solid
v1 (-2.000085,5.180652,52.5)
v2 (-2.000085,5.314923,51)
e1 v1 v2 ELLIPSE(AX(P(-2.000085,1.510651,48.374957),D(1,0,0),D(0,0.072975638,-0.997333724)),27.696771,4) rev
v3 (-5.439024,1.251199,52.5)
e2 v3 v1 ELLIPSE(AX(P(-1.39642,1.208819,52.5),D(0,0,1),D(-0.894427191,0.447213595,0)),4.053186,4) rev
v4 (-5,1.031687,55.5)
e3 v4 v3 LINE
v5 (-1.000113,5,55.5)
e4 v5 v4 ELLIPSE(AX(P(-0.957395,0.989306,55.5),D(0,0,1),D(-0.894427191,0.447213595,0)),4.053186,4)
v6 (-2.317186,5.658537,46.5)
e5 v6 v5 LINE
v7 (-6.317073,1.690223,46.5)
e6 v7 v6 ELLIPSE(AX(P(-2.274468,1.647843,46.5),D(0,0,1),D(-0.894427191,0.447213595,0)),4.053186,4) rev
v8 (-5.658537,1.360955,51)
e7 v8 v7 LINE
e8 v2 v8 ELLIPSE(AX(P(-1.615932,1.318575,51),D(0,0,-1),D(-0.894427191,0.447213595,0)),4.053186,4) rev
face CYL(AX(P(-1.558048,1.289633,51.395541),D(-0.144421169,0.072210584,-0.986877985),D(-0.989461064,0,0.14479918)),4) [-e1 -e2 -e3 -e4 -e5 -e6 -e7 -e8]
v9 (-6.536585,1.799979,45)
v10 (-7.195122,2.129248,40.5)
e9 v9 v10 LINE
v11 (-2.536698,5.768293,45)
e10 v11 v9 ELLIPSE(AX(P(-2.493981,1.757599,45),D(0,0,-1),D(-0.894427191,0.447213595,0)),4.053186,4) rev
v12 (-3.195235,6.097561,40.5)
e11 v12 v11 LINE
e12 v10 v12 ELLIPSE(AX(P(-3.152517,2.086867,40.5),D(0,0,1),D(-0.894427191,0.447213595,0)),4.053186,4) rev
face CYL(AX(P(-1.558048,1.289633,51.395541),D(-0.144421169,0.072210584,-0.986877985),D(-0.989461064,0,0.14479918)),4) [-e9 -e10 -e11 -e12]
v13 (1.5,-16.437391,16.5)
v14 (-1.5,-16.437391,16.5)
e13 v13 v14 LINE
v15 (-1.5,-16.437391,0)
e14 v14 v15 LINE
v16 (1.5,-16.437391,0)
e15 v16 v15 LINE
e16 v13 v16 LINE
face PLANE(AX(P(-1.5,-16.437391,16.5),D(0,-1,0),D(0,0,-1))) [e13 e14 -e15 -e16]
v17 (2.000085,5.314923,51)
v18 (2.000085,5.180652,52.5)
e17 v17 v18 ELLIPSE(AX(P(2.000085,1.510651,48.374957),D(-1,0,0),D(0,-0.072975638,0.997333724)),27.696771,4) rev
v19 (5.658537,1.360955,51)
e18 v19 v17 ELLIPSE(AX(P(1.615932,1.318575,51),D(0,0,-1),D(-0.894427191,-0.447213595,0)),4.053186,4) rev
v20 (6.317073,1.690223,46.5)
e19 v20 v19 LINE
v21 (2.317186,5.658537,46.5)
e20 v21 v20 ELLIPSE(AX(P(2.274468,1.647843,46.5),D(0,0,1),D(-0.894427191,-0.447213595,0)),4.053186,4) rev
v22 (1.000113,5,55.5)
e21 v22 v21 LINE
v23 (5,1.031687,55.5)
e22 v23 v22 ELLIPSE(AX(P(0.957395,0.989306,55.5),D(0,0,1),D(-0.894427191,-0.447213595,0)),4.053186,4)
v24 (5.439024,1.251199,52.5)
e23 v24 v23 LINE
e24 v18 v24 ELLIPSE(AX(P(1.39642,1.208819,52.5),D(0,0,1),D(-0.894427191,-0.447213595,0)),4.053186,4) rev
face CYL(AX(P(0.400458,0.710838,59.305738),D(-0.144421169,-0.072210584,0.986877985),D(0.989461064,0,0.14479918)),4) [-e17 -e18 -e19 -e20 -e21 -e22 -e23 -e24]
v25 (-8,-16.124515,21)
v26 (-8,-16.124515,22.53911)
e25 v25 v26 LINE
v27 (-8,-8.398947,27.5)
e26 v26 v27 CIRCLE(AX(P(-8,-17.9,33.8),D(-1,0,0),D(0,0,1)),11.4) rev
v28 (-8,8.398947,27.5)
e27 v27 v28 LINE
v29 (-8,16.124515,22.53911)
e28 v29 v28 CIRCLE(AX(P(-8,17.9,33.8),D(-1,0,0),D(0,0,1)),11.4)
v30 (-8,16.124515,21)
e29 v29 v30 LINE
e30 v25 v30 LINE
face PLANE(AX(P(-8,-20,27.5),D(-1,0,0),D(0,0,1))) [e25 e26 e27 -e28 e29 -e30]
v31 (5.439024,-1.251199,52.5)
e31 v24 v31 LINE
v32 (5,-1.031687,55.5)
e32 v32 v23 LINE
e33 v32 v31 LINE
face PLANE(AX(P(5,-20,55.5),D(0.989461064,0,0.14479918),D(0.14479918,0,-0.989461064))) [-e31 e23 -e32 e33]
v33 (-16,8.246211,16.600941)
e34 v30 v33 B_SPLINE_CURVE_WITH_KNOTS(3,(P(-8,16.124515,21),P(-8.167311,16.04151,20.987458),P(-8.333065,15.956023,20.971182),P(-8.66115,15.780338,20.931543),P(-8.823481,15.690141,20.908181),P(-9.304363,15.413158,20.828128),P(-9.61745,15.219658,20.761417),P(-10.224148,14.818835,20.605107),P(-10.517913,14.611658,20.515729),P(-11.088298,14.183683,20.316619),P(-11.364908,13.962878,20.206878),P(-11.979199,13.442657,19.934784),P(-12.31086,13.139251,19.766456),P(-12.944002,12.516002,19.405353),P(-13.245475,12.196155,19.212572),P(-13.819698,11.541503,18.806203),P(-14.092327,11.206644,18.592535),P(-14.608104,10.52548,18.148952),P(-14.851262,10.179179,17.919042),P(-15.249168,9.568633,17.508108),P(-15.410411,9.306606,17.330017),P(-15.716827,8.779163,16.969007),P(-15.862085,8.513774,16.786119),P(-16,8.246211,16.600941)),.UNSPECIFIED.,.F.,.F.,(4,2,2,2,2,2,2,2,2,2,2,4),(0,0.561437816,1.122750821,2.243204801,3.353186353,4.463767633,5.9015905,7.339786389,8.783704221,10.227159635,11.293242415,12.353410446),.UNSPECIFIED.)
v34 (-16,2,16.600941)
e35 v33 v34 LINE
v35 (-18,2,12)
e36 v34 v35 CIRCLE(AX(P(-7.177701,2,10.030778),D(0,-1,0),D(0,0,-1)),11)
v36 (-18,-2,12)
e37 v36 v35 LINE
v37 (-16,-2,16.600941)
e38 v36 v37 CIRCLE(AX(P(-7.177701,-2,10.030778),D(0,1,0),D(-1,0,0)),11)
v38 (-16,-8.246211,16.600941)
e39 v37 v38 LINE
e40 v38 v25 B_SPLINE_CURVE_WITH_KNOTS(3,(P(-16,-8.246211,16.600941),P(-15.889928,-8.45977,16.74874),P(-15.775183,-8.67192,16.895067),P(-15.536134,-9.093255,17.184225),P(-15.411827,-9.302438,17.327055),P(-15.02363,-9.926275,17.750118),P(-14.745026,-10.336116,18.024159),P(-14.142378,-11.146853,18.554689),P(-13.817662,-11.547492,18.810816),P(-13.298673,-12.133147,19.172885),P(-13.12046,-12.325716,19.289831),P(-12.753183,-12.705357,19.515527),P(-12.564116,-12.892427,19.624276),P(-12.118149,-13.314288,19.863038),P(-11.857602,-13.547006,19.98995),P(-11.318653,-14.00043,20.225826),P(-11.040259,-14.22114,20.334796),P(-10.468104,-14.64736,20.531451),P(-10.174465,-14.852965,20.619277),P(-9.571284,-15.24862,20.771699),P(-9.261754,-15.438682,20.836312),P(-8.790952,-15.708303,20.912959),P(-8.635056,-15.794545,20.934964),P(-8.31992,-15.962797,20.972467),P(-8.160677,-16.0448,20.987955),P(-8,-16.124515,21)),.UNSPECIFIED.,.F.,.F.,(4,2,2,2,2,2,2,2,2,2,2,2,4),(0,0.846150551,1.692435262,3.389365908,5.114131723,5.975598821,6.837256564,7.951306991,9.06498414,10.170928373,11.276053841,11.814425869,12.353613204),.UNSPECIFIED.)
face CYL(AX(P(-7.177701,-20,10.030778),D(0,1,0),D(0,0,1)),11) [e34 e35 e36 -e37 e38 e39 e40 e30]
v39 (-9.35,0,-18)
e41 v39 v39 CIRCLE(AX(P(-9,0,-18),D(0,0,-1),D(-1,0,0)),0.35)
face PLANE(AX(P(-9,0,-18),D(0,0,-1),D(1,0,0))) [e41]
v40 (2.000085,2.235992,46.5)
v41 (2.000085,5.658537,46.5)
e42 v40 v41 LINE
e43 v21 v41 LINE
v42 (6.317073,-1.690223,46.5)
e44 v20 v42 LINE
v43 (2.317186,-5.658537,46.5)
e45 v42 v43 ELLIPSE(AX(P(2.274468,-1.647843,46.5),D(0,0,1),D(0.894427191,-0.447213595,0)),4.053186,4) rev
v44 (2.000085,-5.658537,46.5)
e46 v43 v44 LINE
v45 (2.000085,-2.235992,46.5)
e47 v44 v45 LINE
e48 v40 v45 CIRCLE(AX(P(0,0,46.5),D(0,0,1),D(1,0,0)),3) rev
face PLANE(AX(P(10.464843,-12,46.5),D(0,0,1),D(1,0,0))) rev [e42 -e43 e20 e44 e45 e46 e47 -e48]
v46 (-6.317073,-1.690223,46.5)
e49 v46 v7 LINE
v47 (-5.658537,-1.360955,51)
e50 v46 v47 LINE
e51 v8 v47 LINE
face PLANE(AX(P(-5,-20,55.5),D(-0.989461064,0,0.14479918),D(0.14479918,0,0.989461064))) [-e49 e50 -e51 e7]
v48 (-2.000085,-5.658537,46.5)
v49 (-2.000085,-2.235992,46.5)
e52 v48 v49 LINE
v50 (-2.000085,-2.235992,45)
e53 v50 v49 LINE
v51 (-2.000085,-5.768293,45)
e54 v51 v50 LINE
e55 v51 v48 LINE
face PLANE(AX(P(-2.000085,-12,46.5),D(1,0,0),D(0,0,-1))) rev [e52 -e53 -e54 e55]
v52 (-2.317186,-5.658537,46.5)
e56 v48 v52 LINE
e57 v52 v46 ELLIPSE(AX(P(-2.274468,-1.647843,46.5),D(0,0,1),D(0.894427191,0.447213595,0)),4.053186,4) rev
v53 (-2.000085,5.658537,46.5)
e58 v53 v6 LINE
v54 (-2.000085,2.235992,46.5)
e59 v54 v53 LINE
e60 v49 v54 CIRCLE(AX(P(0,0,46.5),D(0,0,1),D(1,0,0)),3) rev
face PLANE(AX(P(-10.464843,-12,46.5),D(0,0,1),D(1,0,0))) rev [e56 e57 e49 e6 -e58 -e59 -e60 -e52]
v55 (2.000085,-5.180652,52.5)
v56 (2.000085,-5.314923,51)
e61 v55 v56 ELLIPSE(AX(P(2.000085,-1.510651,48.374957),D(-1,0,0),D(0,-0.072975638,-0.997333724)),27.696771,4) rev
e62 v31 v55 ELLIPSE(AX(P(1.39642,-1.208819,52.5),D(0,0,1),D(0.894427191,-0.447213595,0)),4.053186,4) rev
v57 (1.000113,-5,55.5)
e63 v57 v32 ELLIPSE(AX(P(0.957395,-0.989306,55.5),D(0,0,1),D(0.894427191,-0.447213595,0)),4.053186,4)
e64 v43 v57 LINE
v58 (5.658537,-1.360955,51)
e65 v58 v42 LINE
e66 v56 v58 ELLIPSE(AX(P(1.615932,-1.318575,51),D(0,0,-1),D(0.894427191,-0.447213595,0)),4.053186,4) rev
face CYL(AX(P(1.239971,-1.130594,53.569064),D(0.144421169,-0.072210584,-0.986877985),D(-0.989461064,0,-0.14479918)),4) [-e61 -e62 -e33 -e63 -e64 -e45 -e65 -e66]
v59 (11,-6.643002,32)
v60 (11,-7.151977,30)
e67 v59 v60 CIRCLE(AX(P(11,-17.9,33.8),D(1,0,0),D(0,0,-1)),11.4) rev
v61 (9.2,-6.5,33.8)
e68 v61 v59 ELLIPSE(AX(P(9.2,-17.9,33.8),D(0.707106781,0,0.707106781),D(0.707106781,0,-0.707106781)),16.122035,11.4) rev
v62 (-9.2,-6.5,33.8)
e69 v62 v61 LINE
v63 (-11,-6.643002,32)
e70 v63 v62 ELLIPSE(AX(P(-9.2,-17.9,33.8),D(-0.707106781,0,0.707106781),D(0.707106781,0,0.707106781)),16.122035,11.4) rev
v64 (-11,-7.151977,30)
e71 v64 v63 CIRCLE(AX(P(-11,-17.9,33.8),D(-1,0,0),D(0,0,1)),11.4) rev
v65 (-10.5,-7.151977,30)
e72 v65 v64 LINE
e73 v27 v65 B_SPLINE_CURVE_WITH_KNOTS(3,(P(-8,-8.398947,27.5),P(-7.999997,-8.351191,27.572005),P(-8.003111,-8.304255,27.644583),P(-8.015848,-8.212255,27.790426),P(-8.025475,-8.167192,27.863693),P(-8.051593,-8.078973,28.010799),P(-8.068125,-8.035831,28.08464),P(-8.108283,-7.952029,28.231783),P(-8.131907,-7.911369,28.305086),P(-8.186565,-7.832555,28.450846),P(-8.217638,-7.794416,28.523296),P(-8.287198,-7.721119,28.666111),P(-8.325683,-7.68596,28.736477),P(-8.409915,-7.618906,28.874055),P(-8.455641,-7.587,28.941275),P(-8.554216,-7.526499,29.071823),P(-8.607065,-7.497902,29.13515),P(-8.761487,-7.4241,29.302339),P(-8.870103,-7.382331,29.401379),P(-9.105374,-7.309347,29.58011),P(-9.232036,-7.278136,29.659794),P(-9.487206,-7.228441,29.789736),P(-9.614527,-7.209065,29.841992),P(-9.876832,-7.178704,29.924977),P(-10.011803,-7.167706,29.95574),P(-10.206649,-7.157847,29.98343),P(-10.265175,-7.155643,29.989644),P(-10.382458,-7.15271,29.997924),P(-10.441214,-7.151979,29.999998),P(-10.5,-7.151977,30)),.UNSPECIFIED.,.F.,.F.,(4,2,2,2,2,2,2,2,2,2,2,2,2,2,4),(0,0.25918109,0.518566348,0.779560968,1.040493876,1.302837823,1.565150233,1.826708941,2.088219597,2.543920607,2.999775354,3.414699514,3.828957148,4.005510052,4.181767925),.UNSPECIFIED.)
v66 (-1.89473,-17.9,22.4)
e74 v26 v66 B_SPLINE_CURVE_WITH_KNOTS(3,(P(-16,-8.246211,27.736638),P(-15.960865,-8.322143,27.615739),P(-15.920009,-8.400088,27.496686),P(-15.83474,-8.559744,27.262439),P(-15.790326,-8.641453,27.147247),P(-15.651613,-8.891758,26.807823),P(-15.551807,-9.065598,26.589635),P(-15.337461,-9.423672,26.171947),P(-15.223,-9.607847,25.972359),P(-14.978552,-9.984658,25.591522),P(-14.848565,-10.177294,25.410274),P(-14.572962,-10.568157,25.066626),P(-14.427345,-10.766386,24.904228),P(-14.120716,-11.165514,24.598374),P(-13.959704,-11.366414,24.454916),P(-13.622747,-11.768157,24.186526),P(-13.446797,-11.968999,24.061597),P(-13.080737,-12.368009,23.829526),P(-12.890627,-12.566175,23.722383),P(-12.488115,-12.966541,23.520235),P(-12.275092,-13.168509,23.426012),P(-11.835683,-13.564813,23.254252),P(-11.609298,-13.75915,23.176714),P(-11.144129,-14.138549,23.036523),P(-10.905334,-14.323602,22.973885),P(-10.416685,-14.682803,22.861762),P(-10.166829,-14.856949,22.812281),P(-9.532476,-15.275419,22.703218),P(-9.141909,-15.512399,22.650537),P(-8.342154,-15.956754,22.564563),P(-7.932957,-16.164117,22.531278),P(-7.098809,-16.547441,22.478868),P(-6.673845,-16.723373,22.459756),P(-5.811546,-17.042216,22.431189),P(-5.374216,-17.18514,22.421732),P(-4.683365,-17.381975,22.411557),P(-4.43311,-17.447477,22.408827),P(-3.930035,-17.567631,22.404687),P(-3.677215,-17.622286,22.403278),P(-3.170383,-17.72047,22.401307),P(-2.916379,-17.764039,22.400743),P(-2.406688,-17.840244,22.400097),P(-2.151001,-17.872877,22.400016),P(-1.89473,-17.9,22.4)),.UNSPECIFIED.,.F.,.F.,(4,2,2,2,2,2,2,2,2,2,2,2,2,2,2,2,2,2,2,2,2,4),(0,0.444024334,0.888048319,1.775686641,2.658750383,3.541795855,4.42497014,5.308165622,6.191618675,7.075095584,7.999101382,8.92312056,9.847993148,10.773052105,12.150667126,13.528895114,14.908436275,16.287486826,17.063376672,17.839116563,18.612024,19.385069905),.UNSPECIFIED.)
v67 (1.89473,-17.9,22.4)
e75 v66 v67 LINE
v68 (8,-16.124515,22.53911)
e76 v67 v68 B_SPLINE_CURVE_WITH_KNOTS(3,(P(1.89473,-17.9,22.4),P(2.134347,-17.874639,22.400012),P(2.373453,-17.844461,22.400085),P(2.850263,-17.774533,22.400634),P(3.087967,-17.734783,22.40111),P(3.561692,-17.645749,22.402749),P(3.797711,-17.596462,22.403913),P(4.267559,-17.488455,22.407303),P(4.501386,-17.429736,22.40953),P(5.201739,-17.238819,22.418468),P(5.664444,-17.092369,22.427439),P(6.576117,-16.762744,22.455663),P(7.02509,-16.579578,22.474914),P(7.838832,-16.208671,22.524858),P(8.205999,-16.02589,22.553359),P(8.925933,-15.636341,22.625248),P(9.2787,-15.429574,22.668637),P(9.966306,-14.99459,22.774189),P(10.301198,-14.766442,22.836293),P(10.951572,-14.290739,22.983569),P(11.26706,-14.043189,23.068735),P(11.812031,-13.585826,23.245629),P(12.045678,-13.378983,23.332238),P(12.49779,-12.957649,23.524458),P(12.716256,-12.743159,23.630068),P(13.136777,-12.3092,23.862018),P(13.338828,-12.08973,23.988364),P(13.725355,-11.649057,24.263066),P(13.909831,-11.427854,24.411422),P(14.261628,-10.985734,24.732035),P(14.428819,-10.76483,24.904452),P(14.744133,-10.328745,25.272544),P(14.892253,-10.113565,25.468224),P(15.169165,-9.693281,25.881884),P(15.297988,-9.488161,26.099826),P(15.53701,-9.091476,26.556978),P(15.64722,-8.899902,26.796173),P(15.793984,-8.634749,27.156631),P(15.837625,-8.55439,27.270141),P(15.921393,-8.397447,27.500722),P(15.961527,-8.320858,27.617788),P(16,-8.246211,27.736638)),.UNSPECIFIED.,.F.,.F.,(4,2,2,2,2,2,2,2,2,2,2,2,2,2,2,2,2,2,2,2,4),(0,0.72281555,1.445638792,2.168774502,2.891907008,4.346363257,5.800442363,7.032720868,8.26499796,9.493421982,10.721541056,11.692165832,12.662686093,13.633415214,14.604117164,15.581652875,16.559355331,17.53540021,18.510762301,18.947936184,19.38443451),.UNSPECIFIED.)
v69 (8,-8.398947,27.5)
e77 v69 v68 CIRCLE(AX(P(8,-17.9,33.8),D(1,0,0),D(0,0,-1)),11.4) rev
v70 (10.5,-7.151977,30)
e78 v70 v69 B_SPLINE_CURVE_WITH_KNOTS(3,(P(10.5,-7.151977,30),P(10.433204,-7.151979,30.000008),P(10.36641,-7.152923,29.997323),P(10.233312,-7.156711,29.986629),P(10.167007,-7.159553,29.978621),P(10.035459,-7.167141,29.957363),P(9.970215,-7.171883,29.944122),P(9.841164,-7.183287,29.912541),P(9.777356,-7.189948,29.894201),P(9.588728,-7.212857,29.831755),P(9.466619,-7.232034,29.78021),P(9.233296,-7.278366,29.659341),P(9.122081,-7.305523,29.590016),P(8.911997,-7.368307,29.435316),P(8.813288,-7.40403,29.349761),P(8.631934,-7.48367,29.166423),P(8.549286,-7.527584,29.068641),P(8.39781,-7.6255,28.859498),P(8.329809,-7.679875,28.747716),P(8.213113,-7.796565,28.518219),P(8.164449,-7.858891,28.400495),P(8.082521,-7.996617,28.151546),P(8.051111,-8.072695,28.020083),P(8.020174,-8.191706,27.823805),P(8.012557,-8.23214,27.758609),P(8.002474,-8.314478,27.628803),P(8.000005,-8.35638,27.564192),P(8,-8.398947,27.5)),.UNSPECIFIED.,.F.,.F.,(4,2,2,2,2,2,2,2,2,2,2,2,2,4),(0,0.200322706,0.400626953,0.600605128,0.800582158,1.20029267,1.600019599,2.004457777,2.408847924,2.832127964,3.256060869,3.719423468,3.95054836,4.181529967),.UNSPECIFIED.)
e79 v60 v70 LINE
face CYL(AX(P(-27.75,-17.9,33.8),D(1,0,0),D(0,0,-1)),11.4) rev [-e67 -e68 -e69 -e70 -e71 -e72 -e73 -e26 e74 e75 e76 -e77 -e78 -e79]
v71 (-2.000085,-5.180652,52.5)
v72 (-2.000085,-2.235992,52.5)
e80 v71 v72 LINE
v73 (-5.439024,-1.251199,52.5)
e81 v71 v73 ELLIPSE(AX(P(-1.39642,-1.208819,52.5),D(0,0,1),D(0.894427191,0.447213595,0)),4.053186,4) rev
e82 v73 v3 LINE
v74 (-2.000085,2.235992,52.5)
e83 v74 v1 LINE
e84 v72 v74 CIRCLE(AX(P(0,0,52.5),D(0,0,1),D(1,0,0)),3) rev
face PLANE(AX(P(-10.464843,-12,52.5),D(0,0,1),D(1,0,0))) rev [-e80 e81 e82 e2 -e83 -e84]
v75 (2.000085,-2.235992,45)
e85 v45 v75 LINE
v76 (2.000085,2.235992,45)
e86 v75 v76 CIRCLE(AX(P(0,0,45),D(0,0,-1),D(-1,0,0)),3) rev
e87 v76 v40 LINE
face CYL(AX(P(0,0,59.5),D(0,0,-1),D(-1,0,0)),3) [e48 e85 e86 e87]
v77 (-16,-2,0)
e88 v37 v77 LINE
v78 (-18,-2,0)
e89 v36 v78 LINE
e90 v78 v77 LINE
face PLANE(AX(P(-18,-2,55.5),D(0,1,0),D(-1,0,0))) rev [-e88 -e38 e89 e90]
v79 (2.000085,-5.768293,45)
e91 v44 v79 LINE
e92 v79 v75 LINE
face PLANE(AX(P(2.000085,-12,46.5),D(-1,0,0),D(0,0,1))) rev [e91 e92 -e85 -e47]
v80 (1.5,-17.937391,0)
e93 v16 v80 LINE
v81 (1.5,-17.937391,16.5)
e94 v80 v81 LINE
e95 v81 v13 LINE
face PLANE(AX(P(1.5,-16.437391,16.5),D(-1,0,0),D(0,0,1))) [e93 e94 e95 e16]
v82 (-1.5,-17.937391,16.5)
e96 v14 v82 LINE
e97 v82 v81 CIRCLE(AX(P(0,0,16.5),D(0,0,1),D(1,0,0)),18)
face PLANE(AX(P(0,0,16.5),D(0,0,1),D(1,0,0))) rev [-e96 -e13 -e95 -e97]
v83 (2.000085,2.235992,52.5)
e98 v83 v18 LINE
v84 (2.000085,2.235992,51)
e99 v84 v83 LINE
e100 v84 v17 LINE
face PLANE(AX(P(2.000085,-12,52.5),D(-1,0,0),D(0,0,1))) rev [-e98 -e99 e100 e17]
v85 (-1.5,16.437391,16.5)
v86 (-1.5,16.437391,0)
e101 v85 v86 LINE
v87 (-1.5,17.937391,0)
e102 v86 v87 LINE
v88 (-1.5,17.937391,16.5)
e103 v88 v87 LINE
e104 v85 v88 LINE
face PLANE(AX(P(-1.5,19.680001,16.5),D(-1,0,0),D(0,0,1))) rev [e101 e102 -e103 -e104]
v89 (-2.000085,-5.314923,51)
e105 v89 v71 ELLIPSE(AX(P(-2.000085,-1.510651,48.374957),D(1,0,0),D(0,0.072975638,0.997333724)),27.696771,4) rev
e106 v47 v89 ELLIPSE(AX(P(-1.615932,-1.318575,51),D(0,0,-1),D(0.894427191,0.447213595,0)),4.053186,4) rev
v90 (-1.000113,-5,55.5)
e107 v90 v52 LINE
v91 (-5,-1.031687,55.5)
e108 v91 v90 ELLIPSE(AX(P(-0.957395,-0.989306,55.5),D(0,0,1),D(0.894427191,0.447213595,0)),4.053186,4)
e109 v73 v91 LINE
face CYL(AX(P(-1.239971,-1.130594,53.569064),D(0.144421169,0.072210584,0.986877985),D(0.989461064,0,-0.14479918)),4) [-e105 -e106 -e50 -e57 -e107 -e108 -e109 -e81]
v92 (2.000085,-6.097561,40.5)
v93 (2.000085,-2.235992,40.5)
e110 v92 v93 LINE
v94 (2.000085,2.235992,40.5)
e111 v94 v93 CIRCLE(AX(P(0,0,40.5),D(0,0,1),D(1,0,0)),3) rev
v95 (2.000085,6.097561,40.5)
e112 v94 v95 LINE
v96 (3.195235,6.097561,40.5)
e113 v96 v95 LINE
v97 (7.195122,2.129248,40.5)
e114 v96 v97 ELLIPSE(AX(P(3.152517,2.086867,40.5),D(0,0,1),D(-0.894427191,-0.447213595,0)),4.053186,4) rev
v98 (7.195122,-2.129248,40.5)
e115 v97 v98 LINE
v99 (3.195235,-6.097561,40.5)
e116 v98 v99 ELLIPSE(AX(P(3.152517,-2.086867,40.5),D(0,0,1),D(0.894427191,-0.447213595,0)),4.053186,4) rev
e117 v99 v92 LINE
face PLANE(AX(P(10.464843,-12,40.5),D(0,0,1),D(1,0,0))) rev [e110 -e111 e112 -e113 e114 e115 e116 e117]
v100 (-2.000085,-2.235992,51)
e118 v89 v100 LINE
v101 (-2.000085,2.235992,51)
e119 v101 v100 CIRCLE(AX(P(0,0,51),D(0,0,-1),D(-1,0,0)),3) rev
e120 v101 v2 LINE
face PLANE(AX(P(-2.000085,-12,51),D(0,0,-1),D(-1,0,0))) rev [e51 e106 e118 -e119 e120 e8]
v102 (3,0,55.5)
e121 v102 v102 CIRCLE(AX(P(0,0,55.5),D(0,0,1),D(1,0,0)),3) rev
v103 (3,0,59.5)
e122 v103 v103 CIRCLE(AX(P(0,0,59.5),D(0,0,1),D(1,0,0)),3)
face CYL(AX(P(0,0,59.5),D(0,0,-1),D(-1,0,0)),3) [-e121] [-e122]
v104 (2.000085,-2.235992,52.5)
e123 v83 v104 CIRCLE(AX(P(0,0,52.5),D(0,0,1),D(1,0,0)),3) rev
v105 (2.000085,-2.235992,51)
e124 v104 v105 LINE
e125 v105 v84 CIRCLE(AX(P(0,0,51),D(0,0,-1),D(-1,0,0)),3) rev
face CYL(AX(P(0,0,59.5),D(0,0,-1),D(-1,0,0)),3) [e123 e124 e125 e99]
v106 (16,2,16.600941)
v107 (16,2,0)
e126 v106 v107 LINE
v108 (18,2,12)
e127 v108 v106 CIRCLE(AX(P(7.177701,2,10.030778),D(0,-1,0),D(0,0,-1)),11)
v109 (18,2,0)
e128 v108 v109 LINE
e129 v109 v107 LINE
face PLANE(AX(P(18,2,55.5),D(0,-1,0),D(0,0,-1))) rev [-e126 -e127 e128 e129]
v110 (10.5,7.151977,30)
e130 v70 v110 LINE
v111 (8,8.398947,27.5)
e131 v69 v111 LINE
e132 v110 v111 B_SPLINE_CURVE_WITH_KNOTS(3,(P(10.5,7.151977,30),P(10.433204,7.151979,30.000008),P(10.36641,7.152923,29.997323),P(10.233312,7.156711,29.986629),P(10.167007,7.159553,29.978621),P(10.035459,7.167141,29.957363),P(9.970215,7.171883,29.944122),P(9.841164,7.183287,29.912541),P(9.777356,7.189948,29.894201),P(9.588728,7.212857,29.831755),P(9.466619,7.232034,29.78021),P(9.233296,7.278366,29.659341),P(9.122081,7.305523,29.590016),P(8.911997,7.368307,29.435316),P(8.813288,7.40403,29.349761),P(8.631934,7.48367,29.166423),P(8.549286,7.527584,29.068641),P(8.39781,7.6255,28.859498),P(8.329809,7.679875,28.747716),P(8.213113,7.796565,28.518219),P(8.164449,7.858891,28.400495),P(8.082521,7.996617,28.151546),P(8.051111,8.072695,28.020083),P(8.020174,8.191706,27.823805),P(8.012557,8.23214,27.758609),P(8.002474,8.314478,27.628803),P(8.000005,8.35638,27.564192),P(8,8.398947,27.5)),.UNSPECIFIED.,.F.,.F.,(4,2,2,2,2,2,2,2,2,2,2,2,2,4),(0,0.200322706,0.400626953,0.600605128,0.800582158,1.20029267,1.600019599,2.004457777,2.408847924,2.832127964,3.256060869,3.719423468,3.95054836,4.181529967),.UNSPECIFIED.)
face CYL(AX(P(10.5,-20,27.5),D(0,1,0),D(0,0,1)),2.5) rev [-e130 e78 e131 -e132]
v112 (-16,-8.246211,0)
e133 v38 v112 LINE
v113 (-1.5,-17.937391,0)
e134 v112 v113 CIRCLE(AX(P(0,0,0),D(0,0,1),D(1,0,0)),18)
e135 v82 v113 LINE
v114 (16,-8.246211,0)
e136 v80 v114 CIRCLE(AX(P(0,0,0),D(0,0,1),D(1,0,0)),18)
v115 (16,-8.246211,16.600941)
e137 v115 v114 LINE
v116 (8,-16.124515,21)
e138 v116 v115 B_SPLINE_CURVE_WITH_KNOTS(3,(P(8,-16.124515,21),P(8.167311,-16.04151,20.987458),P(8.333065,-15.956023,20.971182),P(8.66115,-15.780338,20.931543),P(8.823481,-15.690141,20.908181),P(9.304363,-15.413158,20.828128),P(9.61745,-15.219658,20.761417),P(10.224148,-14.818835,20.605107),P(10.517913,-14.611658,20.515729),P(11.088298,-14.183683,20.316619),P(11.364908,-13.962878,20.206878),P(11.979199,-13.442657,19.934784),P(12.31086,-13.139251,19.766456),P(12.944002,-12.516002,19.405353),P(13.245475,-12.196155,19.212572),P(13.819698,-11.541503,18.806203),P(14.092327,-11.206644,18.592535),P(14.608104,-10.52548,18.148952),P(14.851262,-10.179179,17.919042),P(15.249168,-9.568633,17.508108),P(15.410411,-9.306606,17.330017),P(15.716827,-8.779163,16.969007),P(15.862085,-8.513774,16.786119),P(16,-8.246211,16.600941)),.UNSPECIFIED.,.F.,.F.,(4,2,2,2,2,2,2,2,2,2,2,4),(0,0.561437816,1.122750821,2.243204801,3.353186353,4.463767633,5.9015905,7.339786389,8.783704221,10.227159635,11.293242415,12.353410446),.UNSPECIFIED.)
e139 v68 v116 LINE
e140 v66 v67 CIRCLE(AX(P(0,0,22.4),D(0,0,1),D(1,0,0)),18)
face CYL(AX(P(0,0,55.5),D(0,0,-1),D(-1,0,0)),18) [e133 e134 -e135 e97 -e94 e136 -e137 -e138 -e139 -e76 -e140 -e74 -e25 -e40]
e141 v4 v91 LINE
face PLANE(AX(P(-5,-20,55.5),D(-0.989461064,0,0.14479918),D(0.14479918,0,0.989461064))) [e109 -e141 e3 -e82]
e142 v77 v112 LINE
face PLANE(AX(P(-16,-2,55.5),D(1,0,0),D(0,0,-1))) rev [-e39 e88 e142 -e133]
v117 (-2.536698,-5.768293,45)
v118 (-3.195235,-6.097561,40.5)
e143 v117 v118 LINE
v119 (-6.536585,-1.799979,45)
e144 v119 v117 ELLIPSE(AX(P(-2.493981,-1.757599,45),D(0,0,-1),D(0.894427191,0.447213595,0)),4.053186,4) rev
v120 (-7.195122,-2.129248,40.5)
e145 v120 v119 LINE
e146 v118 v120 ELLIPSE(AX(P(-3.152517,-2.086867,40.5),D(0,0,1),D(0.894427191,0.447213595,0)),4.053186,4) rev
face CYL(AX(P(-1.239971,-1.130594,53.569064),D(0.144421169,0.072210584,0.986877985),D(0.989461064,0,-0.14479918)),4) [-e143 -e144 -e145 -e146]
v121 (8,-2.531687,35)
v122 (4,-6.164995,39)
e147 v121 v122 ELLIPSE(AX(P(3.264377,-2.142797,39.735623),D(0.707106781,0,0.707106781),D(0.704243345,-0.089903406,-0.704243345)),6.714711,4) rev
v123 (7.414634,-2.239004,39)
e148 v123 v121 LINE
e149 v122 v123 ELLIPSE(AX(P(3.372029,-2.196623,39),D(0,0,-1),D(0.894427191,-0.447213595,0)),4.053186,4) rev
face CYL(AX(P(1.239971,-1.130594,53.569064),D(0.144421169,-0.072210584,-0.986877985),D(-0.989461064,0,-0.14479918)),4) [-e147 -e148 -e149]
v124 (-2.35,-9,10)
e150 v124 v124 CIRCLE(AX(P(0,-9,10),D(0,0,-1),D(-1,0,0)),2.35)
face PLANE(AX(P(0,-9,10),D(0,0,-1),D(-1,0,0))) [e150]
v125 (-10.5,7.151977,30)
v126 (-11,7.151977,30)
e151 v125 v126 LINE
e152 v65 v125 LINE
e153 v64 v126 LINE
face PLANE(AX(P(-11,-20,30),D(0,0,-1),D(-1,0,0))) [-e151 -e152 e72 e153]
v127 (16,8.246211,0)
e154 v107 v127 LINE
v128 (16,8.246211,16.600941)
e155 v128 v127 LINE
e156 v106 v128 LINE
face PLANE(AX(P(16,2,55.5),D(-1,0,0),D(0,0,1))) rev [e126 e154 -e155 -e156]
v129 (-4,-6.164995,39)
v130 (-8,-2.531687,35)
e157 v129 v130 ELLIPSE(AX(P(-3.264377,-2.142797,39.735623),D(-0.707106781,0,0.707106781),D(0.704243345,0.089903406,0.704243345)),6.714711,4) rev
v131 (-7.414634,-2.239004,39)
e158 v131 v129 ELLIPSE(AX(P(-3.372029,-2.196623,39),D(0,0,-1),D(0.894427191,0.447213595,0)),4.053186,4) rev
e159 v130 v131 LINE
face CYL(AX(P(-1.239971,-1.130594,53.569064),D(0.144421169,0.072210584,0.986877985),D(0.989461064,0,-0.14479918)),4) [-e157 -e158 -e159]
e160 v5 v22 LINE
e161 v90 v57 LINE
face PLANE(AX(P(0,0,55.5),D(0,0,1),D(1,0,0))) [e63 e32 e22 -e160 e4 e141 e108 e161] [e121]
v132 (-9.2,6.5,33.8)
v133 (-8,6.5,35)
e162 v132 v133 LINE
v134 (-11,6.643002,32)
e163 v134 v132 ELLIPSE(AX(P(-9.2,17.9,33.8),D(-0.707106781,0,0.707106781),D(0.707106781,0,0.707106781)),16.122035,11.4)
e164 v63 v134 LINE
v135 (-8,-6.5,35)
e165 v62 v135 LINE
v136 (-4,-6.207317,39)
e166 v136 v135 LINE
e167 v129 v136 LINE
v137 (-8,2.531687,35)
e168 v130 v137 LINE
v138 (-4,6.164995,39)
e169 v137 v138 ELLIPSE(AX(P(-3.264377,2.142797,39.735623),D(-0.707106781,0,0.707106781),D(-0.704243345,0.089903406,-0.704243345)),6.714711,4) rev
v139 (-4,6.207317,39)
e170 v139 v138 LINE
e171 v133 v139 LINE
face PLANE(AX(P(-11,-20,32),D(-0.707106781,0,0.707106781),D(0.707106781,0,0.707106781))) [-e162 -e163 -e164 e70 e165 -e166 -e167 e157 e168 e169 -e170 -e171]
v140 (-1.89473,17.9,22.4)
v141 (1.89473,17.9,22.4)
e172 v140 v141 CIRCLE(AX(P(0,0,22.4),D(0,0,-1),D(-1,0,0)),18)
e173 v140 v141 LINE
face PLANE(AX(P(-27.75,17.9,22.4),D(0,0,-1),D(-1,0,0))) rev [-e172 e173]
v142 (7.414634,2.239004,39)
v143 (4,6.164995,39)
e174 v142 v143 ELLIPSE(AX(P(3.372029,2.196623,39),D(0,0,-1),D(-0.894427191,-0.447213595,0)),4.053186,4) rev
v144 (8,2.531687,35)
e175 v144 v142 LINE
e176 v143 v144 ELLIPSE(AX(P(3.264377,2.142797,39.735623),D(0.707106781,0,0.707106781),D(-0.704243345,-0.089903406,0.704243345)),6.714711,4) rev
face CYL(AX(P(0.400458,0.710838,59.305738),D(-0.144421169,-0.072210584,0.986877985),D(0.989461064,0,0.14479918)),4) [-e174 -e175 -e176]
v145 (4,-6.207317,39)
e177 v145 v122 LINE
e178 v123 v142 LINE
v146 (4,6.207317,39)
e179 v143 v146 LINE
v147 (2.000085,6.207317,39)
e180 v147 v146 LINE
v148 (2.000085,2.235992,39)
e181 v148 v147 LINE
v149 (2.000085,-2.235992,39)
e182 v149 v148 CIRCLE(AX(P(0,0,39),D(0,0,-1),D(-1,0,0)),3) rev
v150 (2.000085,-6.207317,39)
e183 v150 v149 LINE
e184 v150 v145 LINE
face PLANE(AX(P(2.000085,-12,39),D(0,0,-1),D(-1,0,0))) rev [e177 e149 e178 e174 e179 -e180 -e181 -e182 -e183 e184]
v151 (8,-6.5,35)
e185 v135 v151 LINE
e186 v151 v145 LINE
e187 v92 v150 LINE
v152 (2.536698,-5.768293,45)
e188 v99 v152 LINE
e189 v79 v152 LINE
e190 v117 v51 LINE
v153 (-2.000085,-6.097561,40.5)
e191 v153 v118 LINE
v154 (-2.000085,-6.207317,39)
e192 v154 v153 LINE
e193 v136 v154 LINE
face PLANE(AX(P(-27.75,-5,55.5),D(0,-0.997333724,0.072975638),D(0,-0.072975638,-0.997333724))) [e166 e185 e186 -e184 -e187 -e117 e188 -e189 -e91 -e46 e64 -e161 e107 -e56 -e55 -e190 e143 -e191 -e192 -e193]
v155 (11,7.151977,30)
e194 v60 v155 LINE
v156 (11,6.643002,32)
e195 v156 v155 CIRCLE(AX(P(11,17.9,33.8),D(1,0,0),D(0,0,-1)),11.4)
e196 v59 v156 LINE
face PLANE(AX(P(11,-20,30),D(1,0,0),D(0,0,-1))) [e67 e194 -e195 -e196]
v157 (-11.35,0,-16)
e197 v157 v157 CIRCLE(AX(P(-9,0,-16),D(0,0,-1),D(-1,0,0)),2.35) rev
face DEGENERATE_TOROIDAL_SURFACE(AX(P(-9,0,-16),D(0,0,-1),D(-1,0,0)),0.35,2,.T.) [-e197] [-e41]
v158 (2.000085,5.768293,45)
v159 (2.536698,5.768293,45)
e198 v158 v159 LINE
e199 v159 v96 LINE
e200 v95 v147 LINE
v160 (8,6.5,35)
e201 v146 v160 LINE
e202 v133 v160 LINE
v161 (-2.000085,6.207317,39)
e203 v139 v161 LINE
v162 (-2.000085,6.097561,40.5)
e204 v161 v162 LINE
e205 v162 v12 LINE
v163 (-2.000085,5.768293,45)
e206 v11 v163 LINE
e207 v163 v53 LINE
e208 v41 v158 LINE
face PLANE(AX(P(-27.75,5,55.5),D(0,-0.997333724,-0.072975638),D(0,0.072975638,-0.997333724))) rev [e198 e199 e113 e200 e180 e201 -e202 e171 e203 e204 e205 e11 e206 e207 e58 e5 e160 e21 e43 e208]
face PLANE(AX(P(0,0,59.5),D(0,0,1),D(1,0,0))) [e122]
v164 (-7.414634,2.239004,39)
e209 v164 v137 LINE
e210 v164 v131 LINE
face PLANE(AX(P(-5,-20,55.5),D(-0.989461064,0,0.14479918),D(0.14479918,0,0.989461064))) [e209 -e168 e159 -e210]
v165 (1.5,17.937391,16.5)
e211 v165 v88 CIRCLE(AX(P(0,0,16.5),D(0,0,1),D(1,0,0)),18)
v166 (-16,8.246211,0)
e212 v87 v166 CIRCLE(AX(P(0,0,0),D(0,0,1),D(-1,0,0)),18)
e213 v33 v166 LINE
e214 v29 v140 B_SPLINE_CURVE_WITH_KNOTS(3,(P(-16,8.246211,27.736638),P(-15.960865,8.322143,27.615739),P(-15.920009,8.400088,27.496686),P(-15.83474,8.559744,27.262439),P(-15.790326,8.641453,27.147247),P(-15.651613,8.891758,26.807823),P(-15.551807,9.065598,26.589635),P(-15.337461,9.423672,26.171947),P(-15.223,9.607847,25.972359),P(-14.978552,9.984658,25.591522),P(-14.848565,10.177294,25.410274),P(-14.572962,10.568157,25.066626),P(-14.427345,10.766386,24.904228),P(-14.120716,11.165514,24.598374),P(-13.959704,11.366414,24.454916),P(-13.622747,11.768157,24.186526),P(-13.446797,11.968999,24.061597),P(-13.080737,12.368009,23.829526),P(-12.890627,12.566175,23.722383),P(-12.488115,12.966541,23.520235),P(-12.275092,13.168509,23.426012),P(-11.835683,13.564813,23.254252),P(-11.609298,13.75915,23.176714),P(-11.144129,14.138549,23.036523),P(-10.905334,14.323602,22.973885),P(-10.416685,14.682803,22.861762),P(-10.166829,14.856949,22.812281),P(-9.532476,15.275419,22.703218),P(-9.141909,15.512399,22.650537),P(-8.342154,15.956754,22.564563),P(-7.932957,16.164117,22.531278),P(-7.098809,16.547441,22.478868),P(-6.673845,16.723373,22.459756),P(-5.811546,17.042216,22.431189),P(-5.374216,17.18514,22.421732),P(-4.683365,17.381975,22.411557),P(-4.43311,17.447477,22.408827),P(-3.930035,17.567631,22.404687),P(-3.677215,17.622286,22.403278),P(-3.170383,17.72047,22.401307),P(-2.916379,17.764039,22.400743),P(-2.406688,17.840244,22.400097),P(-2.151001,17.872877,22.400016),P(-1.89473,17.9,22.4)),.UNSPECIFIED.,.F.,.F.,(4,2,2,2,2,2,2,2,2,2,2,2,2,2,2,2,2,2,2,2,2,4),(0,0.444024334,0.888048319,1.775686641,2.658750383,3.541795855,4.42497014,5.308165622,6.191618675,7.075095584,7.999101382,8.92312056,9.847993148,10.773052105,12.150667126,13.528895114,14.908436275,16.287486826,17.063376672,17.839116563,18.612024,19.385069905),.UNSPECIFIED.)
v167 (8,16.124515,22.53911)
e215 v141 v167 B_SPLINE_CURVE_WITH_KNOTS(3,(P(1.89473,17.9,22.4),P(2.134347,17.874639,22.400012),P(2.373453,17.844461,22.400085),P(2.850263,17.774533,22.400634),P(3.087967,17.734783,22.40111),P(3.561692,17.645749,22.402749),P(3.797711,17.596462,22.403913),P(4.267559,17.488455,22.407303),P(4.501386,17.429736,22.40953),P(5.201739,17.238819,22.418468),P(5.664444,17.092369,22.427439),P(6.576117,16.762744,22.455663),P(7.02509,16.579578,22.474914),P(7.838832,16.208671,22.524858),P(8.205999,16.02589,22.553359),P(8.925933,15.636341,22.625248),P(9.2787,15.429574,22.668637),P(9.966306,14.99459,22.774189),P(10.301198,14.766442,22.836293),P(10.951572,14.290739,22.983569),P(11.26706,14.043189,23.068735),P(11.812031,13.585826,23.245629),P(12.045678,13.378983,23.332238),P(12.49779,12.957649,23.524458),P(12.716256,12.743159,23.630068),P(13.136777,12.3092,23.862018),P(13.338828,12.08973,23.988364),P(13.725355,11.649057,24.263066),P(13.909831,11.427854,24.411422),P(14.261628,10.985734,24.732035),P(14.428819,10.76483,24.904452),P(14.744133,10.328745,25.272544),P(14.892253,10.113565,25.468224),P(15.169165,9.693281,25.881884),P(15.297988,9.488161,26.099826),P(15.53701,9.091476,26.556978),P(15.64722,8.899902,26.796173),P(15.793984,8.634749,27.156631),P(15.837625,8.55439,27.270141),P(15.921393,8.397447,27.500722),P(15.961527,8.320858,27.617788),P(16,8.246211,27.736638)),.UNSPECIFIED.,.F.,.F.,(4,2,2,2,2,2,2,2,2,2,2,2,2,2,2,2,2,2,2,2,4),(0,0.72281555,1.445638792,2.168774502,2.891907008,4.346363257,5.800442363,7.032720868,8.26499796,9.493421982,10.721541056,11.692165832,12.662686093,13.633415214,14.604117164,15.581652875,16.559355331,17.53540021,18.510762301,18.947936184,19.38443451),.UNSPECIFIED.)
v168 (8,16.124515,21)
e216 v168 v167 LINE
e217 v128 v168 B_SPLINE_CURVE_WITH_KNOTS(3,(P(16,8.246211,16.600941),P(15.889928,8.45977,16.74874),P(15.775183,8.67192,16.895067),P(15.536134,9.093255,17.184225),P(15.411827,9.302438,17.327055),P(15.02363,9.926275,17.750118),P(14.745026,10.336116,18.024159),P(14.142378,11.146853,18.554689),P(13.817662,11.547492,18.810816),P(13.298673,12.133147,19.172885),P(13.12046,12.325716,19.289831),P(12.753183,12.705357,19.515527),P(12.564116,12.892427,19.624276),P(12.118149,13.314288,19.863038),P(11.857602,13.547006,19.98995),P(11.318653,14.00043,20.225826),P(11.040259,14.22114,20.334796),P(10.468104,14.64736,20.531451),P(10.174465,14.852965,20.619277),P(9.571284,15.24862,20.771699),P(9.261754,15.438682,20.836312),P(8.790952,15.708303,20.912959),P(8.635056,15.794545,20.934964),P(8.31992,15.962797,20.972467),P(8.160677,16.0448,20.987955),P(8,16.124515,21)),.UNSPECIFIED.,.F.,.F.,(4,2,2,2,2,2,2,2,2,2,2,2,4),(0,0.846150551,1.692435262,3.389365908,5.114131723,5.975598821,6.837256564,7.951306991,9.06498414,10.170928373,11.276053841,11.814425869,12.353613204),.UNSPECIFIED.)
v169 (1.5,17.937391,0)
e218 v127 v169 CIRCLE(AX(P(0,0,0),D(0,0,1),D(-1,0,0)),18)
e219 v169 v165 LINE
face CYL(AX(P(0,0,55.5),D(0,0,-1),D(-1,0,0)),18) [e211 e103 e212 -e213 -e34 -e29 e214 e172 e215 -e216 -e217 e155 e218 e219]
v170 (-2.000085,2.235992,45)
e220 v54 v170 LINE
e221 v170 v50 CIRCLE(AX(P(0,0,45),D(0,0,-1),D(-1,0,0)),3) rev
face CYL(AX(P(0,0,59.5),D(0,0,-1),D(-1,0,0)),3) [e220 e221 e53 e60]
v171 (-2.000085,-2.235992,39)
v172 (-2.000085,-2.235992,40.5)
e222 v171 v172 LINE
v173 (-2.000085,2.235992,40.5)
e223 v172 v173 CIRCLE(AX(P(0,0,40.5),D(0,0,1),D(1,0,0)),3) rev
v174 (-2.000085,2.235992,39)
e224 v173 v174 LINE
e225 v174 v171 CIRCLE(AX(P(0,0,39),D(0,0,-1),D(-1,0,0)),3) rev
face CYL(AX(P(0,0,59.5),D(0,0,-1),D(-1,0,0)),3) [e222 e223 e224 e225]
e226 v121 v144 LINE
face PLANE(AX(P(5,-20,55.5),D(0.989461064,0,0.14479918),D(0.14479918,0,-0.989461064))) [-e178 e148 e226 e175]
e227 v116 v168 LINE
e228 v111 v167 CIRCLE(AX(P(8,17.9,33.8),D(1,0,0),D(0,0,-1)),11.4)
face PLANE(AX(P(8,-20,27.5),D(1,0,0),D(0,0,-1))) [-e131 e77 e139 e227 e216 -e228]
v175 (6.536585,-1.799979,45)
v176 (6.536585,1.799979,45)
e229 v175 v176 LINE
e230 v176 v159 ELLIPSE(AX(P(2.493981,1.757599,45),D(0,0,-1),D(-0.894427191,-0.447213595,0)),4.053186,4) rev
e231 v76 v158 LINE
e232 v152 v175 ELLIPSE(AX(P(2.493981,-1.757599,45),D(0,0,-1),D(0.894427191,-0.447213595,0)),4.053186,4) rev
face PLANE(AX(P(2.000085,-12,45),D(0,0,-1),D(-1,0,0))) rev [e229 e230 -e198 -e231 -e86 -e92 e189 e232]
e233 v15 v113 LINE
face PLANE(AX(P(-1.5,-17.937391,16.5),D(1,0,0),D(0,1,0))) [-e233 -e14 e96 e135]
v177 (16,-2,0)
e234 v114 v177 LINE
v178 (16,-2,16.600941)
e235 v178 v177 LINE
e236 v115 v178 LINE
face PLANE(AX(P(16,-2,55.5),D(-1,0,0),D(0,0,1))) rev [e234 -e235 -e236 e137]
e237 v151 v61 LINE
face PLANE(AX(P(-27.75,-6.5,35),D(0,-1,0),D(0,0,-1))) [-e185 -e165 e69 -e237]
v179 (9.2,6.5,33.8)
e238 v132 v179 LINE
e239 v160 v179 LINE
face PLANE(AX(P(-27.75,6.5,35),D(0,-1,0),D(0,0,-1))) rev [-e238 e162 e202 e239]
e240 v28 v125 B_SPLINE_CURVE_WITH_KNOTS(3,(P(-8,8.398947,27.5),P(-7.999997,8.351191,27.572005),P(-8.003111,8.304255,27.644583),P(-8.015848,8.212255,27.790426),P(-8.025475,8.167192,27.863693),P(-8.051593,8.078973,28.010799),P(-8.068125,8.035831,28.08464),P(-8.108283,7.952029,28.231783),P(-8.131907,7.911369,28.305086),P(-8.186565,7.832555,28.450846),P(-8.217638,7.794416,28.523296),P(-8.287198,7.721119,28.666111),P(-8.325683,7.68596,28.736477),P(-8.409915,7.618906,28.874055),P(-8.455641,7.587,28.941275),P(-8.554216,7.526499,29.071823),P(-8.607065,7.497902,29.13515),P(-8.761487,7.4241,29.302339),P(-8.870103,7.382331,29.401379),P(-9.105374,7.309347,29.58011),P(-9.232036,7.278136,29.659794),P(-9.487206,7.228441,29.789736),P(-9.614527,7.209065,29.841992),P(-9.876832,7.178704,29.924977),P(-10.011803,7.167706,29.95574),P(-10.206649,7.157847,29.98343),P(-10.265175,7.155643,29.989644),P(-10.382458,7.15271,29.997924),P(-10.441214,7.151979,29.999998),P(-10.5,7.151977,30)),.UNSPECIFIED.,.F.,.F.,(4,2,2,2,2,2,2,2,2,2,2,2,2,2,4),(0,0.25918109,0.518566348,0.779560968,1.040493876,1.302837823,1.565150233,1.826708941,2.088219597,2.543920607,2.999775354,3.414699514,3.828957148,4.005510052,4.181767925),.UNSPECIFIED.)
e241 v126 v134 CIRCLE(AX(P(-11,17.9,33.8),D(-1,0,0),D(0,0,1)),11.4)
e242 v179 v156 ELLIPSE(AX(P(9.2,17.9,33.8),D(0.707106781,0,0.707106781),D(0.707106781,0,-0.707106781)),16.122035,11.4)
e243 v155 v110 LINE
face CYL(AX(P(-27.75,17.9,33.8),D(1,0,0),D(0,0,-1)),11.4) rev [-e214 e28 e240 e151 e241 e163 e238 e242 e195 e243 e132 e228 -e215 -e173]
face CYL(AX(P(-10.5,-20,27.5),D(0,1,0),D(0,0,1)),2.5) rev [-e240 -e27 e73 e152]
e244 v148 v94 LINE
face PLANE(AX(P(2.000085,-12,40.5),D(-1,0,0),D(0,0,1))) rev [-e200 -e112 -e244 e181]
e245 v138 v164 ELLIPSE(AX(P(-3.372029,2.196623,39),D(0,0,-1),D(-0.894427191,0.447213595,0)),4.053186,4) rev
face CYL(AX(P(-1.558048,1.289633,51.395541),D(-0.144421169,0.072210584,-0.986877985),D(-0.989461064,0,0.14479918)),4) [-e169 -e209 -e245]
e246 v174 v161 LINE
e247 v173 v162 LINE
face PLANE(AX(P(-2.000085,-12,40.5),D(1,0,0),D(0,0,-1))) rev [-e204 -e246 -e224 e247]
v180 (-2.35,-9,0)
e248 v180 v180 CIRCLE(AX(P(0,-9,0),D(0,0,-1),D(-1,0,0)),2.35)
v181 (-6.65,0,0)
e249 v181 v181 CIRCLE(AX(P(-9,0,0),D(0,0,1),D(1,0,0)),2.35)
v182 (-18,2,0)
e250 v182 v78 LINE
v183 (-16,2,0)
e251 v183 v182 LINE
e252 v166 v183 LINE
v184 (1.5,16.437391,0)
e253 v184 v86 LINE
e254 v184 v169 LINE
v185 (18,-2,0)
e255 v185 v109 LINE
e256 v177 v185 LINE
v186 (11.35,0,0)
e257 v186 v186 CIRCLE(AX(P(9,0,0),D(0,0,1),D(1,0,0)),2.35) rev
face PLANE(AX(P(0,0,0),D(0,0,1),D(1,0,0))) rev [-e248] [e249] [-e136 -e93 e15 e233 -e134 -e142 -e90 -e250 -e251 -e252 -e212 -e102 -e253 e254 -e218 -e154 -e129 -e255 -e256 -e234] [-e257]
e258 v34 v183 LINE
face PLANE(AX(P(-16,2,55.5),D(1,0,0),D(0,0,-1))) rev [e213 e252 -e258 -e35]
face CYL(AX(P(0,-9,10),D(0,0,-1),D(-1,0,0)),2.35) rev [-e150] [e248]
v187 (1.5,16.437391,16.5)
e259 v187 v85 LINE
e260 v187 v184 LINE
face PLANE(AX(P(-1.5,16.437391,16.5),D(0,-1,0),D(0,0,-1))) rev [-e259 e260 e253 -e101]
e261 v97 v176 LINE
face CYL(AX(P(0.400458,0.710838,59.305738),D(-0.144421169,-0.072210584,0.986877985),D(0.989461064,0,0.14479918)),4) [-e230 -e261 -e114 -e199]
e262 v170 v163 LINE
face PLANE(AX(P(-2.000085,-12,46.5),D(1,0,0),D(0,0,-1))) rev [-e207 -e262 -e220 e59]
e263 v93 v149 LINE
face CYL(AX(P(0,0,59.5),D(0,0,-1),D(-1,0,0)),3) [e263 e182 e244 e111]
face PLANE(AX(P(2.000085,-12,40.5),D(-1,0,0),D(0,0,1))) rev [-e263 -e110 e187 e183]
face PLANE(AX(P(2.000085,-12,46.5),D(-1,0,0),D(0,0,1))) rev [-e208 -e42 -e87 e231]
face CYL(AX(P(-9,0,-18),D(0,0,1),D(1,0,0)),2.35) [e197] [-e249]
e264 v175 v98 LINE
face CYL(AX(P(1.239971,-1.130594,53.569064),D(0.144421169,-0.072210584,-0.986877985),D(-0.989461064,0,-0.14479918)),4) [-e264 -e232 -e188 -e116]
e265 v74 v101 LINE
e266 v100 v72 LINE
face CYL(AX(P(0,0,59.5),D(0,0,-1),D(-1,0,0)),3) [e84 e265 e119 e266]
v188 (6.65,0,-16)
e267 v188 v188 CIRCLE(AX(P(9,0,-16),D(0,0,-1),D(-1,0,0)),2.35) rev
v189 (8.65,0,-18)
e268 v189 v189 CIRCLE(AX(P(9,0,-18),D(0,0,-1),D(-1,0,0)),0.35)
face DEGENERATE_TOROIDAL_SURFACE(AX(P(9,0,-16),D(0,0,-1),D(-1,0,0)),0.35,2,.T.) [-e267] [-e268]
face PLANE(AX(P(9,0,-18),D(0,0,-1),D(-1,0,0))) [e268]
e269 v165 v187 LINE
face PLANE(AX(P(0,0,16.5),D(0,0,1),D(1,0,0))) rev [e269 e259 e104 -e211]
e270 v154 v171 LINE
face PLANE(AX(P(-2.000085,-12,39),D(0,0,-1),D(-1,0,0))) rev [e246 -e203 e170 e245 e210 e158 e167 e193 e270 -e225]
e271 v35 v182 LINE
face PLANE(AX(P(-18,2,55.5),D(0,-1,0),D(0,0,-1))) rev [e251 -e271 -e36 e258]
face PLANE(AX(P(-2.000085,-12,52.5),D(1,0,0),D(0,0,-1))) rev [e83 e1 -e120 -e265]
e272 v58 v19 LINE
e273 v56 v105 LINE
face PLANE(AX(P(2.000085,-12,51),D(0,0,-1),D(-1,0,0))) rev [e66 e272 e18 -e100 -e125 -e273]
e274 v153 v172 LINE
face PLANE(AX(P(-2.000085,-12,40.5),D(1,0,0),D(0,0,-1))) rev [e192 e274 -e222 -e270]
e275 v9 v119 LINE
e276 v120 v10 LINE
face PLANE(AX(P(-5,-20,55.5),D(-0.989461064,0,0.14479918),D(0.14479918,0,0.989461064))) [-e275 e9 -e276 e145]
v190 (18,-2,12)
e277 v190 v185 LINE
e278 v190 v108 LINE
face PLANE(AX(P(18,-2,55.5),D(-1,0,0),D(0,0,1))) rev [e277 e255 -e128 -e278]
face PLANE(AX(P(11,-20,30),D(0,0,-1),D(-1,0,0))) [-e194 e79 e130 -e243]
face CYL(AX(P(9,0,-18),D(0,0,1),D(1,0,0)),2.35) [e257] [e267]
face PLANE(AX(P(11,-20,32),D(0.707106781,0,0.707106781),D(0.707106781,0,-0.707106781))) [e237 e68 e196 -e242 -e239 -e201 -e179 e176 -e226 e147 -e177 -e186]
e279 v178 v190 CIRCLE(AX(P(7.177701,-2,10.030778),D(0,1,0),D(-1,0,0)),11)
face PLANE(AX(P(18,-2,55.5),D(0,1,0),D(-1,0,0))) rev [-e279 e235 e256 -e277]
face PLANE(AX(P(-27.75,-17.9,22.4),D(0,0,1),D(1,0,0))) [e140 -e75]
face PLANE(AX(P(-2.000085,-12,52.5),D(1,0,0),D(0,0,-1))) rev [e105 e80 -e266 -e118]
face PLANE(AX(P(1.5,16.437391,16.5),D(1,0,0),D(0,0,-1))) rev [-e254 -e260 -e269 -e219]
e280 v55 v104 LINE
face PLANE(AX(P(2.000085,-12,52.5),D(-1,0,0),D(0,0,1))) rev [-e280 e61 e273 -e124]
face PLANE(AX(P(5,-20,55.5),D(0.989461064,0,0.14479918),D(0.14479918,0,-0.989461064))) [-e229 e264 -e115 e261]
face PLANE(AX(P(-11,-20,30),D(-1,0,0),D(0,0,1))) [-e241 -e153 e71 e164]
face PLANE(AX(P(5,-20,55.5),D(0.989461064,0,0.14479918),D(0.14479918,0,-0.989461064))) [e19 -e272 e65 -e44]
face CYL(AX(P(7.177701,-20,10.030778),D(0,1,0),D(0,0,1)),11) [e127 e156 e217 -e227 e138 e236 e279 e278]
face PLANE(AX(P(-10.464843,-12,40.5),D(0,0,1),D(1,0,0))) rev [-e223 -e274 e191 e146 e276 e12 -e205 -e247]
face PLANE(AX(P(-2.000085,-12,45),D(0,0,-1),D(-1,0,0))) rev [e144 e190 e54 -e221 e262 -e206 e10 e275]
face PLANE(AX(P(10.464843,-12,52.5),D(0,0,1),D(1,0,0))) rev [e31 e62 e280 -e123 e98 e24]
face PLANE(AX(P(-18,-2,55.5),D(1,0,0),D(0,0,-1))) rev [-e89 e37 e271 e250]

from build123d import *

# Parameters (mm, degrees)
BOSS_EXTRUDE1_DEPTH  = 55.5
SKETCH4_OUTSIDE_W    = 53.062
SKETCH4_OUTSIDE_H    = 72.562
CUT_EXTRUDE3_DEPTH   = 20
CUT_EXTRUDE4_DEPTH   = 16.5
SKETCH6_R            = 5
BOSS_EXTRUDE3_DEPTH  = 55.5
SKETCH7_OUTSIDE_W    = 72.562
SKETCH7_OUTSIDE_H    = 53.062
CUT_EXTRUDE6_DEPTH   = 27.75
FILLET3_R            = 4
SKETCH8_R            = 2.35
BOSS_EXTRUDE4_DEPTH  = 18
FILLET4_R            = 2
FILLET4_OF_MIRROR2_R = 2
SKETCH10_W           = 8.464758564
SKETCH10_H           = 1.5
CUT_EXTRUDE8_DEPTH   = 12
SKETCH11_R           = 3
BOSS_EXTRUDE6_DEPTH  = 59.5
SKETCH12_R           = 2.35
CUT_EXTRUDE9_DEPTH   = 10


with BuildPart() as part:
    # Sketch1 → Boss-Extrude1 (new body)
    with BuildSketch(Plane.XY):
        with BuildLine():
            Line((-16, 2), (-16, 8.246211251))
            ThreePointArc((-16, 8.246211251), (0, 18), (16, 8.246211251))
            Line((16, 8.246211251), (16, 2))
            Line((16, 2), (18, 2))
            Line((18, 2), (18, -2))
            Line((18, -2), (16, -2))
            Line((16, -2), (16, -8.246211251))
            ThreePointArc((16, -8.246211251), (0, -18), (-16, -8.246211251))
            Line((-16, -8.246211251), (-16, -2))
            Line((-16, -2), (-18, -2))
            Line((-18, -2), (-18, 2))
            Line((-18, 2), (-16, 2))
        make_face()
    extrude(amount=BOSS_EXTRUDE1_DEPTH)

    # Sketch4 outside → Cut-Extrude3 (cut, symmetric)
    with BuildSketch(Plane(origin=(0, 0, 0), x_dir=(1, 0, 0), z_dir=(0, 1, 0))):
        with Locations((0, -27.75)):
            Rectangle(SKETCH4_OUTSIDE_W, SKETCH4_OUTSIDE_H)
        with BuildLine():
            Line((-18, 0), (-18, -12))
            ThreePointArc((-18, -12), (-14.536312565, -18.207013961), (-8, -21))
            Line((-8, -21), (-8, -27.5))
            ThreePointArc((-8, -27.5), (-8.732233047, -29.267766953), (-10.5, -30))
            Line((-10.5, -30), (-11, -30))
            Line((-11, -30), (-11, -32))
            Line((-11, -32), (-8, -35))
            Line((-8, -35), (-5, -55.5))
            Line((-5, -55.5), (5, -55.5))
            Line((5, -55.5), (8, -35))
            Line((8, -35), (11, -32))
            Line((11, -32), (11, -30))
            Line((11, -30), (10.5, -30))
            ThreePointArc((10.5, -30), (8.732233047, -29.267766953), (8, -27.5))
            Line((8, -27.5), (8, -21))
            ThreePointArc((8, -21), (14.536312565, -18.207013961), (18, -12))
            Line((18, -12), (18, 0))
            Line((18, 0), (-18, 0))
        make_face(mode=Mode.SUBTRACT)
    extrude(amount=CUT_EXTRUDE3_DEPTH, both=True, mode=Mode.SUBTRACT)

    # Sketch5 → Cut-Extrude4 (cut)
    with BuildSketch(Plane(origin=(0, 0, 0), x_dir=(-1, 0, 0), z_dir=(0, 0, -1))):
        Polygon((0, 19.680001022), (1.5, 19.680001022), (1.5, 17.937391115), (1.5, 16.437391115), (-1.5, 16.437391115), (-1.5, 19.680001022), align=None)
    cut_extrude4 = extrude(amount=-CUT_EXTRUDE4_DEPTH, mode=Mode.SUBTRACT)

    # Mirror1: Cut-Extrude4 across plane
    add(cut_extrude4.mirror(Plane.ZX), mode=Mode.SUBTRACT)

    # Sketch6 → Boss-Extrude3 (add)
    with BuildSketch(Plane.XY):
        Circle(SKETCH6_R)
    extrude(amount=BOSS_EXTRUDE3_DEPTH)

    # Sketch7 outside → Cut-Extrude6 (cut, symmetric)
    with BuildSketch(Plane(origin=(0, 0, 0), x_dir=(0, 0, -1), z_dir=(1, 0, 0))):
        with Locations((-27.75, 0)):
            Rectangle(SKETCH7_OUTSIDE_W, SKETCH7_OUTSIDE_H)
        with BuildLine():
            Line((-22.4, 17.937391115), (-22.4, 20.910001086))
            Line((-22.4, 20.910001086), (0, 20.910001086))
            Line((0, 20.910001086), (0, 17.937391115))
            Line((0, 17.937391115), (0, -17.937391115))
            Line((0, -17.937391115), (0, -20.333967998))
            Line((0, -20.333967998), (-22.4, -20.333967998))
            Line((-22.4, -20.333967998), (-22.4, -17.9))
            ThreePointArc((-22.4, -17.9), (-25.738982694, -9.838982694), (-33.8, -6.5))
            Line((-33.8, -6.5), (-35, -6.5))
            Line((-35, -6.5), (-55.5, -5))
            Line((-55.5, -5), (-55.5, 5))
            Line((-55.5, 5), (-35, 6.5))
            Line((-35, 6.5), (-33.8, 6.5))
            ThreePointArc((-33.8, 6.5), (-25.738982694, 9.838982694), (-22.4, 17.9))
            Line((-22.4, 17.9), (-22.4, 17.937391115))
        make_face(mode=Mode.SUBTRACT)
    extrude(amount=CUT_EXTRUDE6_DEPTH, both=True, mode=Mode.SUBTRACT)

    # Fillet3
    # the kernel refuses this fillet: 4 mm, written as the material it takes off along each edge
    with BuildSketch(Plane(origin=(3.570969245, 4.285484623, 65.26504349), x_dir=(0.010456033399530511, -0.9973894081641158, -0.0714495615632633), z_dir=(0.14442116856011564, 0.07221058427983153, -0.9868779851580924))) as fillet3_piece_1_section:
        with BuildLine():
            CenterArc((FILLET3_R * 0.989488430862, FILLET3_R), FILLET3_R, 180.605445032, 89.394554968)
            Line((-FILLET3_R * 0.0104557388149, FILLET3_R * 0.989433187404), (0, 0))
            Line((0, 0), (FILLET3_R * 0.989488430862, 0))
        make_face()
    fillet3_piece_1 = extrude(amount=40.562346695, mode=Mode.PRIVATE)
    fillet3_piece_1 = split(fillet3_piece_1, bisect_by=Plane(origin=(-1.347793771, 4.447005001, 44.347793771), z_dir=(0.7071067811865519, 0, 0.7071067811865431)), keep=Keep.TOP, mode=Mode.PRIVATE)
    add(fillet3_piece_1, mode=Mode.SUBTRACT)
    with BuildSketch(Plane(origin=(9.429030755, -7.214515377, 25.23495651), x_dir=(0.01045603339953013, 0.9973894081641159, -0.07144956156326311), z_dir=(-0.14442116856011564, 0.07221058427983126, 0.9868779851580924))) as fillet3_piece_2_section:
        with BuildLine():
            CenterArc((FILLET3_R * 0.989488430862, FILLET3_R), FILLET3_R, 180.605445032, 89.394554968)
            Line((-FILLET3_R * 0.0104557388149, FILLET3_R * 0.989433187404), (0, 0))
            Line((0, 0), (FILLET3_R * 0.989488430862, 0))
        make_face()
    fillet3_piece_2 = extrude(amount=40.562346695, mode=Mode.PRIVATE)
    fillet3_piece_2 = split(fillet3_piece_2, bisect_by=Plane(origin=(-1.347793771, -4.447005001, 44.347793771), z_dir=(0.7071067811865519, 0, 0.7071067811865431)), keep=Keep.TOP, mode=Mode.PRIVATE)
    add(fillet3_piece_2, mode=Mode.SUBTRACT)
    with BuildSketch(Plane(origin=(-9.429030755, 7.214515377, 25.23495651), x_dir=(-0.010456033399530862, -0.9973894081641158, -0.07144956156326325), z_dir=(0.14442116856011541, -0.07221058427983153, 0.9868779851580924))) as fillet3_piece_3_section:
        with BuildLine():
            CenterArc((FILLET3_R * 0.989488430862, FILLET3_R), FILLET3_R, 180.605445032, 89.394554968)
            Line((-FILLET3_R * 0.0104557388149, FILLET3_R * 0.989433187404), (0, 0))
            Line((0, 0), (FILLET3_R * 0.989488430862, 0))
        make_face()
    fillet3_piece_3 = extrude(amount=40.562346695, mode=Mode.PRIVATE)
    fillet3_piece_3 = split(fillet3_piece_3, bisect_by=Plane(origin=(1.347793771, 4.447005001, 44.347793771), z_dir=(-0.7071067811865516, 0, 0.7071067811865436)), keep=Keep.TOP, mode=Mode.PRIVATE)
    add(fillet3_piece_3, mode=Mode.SUBTRACT)
    with BuildSketch(Plane(origin=(-3.570969245, -4.285484623, 65.26504349), x_dir=(0.9895163091489351, -0.010539226961374241, -0.1440361018055054), z_dir=(-0.14442116856011541, -0.07221058427983126, -0.9868779851580924))) as fillet3_piece_4_section:
        with BuildLine():
            CenterArc((FILLET3_R * 0.989488430862, -FILLET3_R), FILLET3_R, 90, 89.394554968)
            Line((-FILLET3_R * 0.0104557388149, -FILLET3_R * 0.989433187404), (0, 0))
            Line((0, 0), (FILLET3_R * 0.989488430862, 0))
        make_face()
    fillet3_piece_4 = extrude(amount=40.562346695, mode=Mode.PRIVATE)
    fillet3_piece_4 = split(fillet3_piece_4, bisect_by=Plane(origin=(1.347793771, -4.447005001, 44.347793771), z_dir=(-0.7071067811865516, 0, 0.7071067811865436)), keep=Keep.TOP, mode=Mode.PRIVATE)
    add(fillet3_piece_4, mode=Mode.SUBTRACT)

    # Sketch8 → Boss-Extrude4 (add)
    with BuildSketch(Plane(origin=(0, 0, 0), x_dir=(-1, 0, 0), z_dir=(0, 0, -1))):
        with Locations(Location((-9, 0, 0), (0, 0, 180))):
            Circle(SKETCH8_R)
    boss_extrude4 = extrude(amount=BOSS_EXTRUDE4_DEPTH)

    # Fillet4
    fillet4_edges = [part.edges().sort_by_distance(p)[0] for p in [
        (6.65, 0, -18),
    ]]
    fillet(fillet4_edges, radius=FILLET4_R)

    # Mirror2: Boss-Extrude4 across plane
    add(boss_extrude4.mirror(Plane(origin=(0, 0, 0), x_dir=(0, 0, 1), z_dir=(1, 0, 0))))

    # Fillet4 of Mirror2
    fillet4_of_mirror2_edges = [part.edges().sort_by_distance(p)[0] for p in [
        (-6.65, 0, -18),
    ]]
    fillet(fillet4_of_mirror2_edges, radius=FILLET4_OF_MIRROR2_R)

    # Sketch10 → Cut-Extrude8 (cut, symmetric)
    with BuildSketch(Plane(origin=(0, 0, 0), x_dir=(1, 0, 0), z_dir=(0, 1, 0))):
        with Locations((6.232463803, -39.75)):
            Rectangle(SKETCH10_W, SKETCH10_H)
        with Locations((6.232463803, -45.75)):
            Rectangle(SKETCH10_W, SKETCH10_H)
        with Locations((6.232463803, -51.75)):
            Rectangle(SKETCH10_W, SKETCH10_H)
        with Locations((-6.232463803, -51.75)):
            Rectangle(SKETCH10_W, SKETCH10_H)
        with Locations((-6.232463803, -45.75)):
            Rectangle(SKETCH10_W, SKETCH10_H)
        with Locations((-6.232463803, -39.75)):
            Rectangle(SKETCH10_W, SKETCH10_H)
    extrude(amount=CUT_EXTRUDE8_DEPTH, both=True, mode=Mode.SUBTRACT)

    # Sketch11 → Boss-Extrude6 (add)
    with BuildSketch(Plane.XY):
        Circle(SKETCH11_R)
    extrude(amount=BOSS_EXTRUDE6_DEPTH)

    # Sketch12 → Cut-Extrude9 (cut)
    with BuildSketch(Plane(origin=(0, 0, 0), x_dir=(-1, 0, 0), z_dir=(0, 0, -1))):
        with Locations((0, -9)):
            Circle(SKETCH12_R)
    extrude(amount=-CUT_EXTRUDE9_DEPTH, mode=Mode.SUBTRACT)


solid = part.part
